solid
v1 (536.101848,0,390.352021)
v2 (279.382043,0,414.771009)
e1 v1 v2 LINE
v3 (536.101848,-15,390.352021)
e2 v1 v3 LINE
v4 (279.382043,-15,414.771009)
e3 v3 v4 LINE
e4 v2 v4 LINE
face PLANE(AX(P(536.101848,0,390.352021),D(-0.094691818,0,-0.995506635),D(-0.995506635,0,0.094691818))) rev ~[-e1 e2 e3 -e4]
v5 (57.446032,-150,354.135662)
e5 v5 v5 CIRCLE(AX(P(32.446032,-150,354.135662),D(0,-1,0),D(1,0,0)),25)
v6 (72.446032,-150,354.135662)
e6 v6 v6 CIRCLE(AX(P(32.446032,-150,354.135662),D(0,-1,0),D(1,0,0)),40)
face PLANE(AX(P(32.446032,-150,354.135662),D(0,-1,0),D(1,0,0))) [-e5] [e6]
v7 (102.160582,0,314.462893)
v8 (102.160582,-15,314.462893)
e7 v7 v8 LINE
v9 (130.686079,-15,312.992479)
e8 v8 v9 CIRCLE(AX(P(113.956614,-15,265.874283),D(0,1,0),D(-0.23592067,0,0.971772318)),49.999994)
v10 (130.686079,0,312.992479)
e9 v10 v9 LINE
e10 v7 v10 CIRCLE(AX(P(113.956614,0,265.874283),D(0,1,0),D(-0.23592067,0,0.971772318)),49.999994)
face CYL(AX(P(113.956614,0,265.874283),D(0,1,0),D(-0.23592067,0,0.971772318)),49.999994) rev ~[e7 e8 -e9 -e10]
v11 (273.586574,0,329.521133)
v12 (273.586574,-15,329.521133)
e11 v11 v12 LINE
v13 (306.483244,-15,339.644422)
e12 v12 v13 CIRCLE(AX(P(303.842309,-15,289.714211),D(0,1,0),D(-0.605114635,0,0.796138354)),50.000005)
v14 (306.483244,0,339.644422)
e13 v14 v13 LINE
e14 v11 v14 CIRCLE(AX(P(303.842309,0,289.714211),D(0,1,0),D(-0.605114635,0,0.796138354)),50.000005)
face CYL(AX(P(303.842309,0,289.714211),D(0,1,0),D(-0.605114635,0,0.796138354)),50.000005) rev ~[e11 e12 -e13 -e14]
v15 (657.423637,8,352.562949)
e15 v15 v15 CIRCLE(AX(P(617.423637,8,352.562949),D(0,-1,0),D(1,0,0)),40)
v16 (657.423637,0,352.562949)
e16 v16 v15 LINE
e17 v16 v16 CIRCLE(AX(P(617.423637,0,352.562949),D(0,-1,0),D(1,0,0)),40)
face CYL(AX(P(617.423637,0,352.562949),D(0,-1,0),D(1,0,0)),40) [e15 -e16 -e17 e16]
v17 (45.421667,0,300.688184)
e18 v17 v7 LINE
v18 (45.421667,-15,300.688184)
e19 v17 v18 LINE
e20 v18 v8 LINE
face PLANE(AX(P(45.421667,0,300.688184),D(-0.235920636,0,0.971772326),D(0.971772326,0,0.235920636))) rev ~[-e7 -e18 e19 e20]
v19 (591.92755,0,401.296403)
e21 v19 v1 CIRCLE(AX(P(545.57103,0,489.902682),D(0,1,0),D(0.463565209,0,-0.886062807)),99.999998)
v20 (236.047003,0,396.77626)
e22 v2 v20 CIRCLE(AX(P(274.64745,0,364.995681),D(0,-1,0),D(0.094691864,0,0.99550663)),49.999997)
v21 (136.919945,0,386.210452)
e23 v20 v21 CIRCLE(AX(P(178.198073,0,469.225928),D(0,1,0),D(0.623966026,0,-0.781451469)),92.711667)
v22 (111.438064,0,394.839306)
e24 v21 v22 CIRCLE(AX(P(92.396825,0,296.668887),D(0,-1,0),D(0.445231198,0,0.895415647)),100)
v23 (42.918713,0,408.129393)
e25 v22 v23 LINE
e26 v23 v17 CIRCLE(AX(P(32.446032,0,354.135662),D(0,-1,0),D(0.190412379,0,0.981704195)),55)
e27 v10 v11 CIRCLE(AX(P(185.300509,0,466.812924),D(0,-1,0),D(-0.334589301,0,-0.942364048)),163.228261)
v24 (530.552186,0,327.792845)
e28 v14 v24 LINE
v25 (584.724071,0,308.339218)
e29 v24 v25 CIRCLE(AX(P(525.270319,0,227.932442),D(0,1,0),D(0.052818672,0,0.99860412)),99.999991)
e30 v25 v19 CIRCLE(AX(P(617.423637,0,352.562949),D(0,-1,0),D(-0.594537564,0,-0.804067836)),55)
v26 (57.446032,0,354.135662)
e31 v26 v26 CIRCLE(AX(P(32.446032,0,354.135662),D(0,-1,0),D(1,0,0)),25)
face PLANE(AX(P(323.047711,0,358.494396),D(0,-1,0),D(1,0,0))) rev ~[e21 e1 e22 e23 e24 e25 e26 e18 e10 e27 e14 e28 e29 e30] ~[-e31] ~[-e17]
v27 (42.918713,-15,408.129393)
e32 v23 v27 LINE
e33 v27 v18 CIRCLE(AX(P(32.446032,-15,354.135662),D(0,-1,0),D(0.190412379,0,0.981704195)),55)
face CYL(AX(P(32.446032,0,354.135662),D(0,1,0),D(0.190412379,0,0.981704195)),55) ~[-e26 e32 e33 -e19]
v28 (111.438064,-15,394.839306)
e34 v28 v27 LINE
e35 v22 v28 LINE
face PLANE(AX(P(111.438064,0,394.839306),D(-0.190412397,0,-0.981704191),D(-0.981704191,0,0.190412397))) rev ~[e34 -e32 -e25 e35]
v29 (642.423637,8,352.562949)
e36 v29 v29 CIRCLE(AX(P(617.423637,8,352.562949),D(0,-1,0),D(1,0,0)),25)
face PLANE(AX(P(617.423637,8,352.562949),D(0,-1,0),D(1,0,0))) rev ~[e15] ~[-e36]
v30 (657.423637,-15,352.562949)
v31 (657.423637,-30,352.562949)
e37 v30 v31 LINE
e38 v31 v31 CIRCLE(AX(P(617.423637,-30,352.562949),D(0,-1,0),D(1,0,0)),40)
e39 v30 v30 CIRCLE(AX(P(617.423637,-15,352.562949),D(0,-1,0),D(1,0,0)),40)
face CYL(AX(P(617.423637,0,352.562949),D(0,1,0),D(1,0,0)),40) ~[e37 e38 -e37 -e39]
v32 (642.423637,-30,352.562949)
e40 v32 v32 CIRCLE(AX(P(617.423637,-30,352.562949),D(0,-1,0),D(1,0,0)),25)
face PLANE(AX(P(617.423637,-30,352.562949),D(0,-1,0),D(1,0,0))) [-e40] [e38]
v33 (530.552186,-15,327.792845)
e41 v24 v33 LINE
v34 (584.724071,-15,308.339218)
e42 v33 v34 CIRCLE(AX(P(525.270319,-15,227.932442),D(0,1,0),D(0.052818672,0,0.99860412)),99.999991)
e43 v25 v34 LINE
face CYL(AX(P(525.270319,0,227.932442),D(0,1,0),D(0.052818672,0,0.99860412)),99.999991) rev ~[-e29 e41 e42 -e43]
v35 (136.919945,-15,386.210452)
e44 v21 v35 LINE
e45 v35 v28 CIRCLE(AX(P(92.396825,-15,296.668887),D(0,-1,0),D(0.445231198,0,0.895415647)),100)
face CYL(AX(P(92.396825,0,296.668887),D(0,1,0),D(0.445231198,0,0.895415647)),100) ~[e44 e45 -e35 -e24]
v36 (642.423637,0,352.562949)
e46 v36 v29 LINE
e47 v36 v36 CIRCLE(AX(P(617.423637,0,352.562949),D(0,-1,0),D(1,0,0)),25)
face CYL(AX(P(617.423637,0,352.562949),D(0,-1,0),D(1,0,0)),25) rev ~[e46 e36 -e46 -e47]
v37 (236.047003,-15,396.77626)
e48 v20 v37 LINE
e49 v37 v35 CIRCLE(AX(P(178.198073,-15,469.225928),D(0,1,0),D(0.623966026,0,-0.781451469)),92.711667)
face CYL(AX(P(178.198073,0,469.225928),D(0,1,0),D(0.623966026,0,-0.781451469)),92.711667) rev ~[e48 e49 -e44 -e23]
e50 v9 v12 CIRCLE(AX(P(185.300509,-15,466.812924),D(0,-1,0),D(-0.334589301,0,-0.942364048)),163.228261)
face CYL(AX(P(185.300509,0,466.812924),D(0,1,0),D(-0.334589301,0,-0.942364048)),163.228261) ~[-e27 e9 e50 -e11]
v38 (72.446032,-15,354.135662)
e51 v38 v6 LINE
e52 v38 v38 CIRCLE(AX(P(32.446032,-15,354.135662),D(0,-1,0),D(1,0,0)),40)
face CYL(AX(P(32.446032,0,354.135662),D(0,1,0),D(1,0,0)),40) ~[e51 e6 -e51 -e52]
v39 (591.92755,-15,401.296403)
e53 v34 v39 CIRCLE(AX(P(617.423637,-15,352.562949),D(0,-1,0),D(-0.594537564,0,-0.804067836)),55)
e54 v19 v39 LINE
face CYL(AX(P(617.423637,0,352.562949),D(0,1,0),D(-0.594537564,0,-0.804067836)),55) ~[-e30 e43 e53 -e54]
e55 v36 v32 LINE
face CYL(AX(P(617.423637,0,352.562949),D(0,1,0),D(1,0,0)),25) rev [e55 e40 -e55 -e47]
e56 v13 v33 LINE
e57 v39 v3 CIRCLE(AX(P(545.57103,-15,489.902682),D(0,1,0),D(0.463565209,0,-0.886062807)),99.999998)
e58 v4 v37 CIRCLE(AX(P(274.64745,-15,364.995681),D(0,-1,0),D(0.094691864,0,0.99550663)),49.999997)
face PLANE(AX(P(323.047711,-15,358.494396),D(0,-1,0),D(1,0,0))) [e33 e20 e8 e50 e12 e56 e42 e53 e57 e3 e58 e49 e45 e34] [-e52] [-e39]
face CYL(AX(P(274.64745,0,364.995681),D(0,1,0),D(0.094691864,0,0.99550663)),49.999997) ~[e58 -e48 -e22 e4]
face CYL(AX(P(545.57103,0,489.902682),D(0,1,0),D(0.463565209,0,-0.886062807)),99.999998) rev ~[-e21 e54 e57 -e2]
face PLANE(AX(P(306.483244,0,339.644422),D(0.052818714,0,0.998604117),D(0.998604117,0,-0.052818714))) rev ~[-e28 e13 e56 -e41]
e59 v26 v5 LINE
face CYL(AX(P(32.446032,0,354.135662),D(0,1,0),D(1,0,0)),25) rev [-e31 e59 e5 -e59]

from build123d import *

# Parameters (mm, degrees)
F0_R     = 40
F1_DEPTH = 15
F0_R_2   = 25
F2_DEPTH = 150
F3_DEPTH = 30
F4_DEPTH = 8


# Not quite as in the source:
# - ends of sketch curves that miss each other by under 0.0002 mm in the source are joined


with BuildPart() as f1:
    # F0 (on Front) → F1 (new body)
    with BuildSketch(Plane.XZ):
        with BuildLine():
            ThreePointArc((136.9199448282, 386.2104516544), (124.4705090254, 391.3857217921), (111.4380638613, 394.8393062852))
            Line((111.4380638613, 394.8393062852), (42.918713, 408.129393))
            ThreePointArc((42.918713, 408.129393), (-22.539049679, 352.8547276711), (45.4216669824, 300.6881840726))
            Line((45.4216669824, 300.6881840726), (102.160582, 314.462893))
            ThreePointArc((102.160582, 314.462893), (116.5305641711, 315.8079808018), (130.6860790256, 312.992479072))
            ThreePointArc((130.6860790256, 312.992479072), (204.0553442227, 304.6657026983), (273.5865736459, 329.5211325506))
            ThreePointArc((273.5865736459, 329.5211325506), (289.1363732598, 337.5026610827), (306.4832439925, 339.6444218586))
            Line((306.4832439925, 339.6444218586), (530.552186, 327.792845))
            ThreePointArc((530.552186, 327.792845), (559.0680406559, 322.0478617496), (584.7240709532, 308.3392179368))
            ThreePointArc((584.7240709532, 308.3392179368), (672.2592374085, 348.3136045992), (591.9275499624, 401.2964030718))
            ThreePointArc((591.9275499624, 401.2964030718), (564.8093719906, 391.7707004398), (536.1018479581, 390.3520205594))
            Line((536.1018479581, 390.3520205594), (279.382043, 414.771009))
            ThreePointArc((279.382043, 414.771009), (255.4725507994, 411.172762836), (236.0470033399, 396.7762595435))
            ThreePointArc((236.0470033399, 396.7762595435), (188.0244125036, 377.0364695299), (136.9199448282, 386.2104516544))
        make_face()
        with Locations((32.446032, 354.135662)):
            Circle(F0_R, mode=Mode.SUBTRACT)
        with Locations((617.423637, 352.562949)):
            Circle(F0_R, mode=Mode.SUBTRACT)
    extrude(amount=F1_DEPTH)

    # F0 (on Front) → F2 (join)
    with BuildSketch(Plane.XZ):
        with Locations((32.446032, 354.135662)):
            Circle(F0_R)
        with Locations((32.446032, 354.135662)):
            Circle(F0_R_2, mode=Mode.SUBTRACT)
    extrude(amount=F2_DEPTH)

    # F0 (on Front) → F3 (join)
    with BuildSketch(Plane.XZ):
        with Locations((617.423637, 352.562949)):
            Circle(F0_R)
        with Locations((617.423637, 352.562949)):
            Circle(F0_R_2, mode=Mode.SUBTRACT)
    extrude(amount=F3_DEPTH)

    # F0 (on Front) → F4 (join)
    with BuildSketch(Plane.XZ):
        with Locations((617.423637, 352.562949)):
            Circle(F0_R)
        with Locations((617.423637, 352.562949)):
            Circle(F0_R_2, mode=Mode.SUBTRACT)
    extrude(amount=-F4_DEPTH)


solid = f1.part
